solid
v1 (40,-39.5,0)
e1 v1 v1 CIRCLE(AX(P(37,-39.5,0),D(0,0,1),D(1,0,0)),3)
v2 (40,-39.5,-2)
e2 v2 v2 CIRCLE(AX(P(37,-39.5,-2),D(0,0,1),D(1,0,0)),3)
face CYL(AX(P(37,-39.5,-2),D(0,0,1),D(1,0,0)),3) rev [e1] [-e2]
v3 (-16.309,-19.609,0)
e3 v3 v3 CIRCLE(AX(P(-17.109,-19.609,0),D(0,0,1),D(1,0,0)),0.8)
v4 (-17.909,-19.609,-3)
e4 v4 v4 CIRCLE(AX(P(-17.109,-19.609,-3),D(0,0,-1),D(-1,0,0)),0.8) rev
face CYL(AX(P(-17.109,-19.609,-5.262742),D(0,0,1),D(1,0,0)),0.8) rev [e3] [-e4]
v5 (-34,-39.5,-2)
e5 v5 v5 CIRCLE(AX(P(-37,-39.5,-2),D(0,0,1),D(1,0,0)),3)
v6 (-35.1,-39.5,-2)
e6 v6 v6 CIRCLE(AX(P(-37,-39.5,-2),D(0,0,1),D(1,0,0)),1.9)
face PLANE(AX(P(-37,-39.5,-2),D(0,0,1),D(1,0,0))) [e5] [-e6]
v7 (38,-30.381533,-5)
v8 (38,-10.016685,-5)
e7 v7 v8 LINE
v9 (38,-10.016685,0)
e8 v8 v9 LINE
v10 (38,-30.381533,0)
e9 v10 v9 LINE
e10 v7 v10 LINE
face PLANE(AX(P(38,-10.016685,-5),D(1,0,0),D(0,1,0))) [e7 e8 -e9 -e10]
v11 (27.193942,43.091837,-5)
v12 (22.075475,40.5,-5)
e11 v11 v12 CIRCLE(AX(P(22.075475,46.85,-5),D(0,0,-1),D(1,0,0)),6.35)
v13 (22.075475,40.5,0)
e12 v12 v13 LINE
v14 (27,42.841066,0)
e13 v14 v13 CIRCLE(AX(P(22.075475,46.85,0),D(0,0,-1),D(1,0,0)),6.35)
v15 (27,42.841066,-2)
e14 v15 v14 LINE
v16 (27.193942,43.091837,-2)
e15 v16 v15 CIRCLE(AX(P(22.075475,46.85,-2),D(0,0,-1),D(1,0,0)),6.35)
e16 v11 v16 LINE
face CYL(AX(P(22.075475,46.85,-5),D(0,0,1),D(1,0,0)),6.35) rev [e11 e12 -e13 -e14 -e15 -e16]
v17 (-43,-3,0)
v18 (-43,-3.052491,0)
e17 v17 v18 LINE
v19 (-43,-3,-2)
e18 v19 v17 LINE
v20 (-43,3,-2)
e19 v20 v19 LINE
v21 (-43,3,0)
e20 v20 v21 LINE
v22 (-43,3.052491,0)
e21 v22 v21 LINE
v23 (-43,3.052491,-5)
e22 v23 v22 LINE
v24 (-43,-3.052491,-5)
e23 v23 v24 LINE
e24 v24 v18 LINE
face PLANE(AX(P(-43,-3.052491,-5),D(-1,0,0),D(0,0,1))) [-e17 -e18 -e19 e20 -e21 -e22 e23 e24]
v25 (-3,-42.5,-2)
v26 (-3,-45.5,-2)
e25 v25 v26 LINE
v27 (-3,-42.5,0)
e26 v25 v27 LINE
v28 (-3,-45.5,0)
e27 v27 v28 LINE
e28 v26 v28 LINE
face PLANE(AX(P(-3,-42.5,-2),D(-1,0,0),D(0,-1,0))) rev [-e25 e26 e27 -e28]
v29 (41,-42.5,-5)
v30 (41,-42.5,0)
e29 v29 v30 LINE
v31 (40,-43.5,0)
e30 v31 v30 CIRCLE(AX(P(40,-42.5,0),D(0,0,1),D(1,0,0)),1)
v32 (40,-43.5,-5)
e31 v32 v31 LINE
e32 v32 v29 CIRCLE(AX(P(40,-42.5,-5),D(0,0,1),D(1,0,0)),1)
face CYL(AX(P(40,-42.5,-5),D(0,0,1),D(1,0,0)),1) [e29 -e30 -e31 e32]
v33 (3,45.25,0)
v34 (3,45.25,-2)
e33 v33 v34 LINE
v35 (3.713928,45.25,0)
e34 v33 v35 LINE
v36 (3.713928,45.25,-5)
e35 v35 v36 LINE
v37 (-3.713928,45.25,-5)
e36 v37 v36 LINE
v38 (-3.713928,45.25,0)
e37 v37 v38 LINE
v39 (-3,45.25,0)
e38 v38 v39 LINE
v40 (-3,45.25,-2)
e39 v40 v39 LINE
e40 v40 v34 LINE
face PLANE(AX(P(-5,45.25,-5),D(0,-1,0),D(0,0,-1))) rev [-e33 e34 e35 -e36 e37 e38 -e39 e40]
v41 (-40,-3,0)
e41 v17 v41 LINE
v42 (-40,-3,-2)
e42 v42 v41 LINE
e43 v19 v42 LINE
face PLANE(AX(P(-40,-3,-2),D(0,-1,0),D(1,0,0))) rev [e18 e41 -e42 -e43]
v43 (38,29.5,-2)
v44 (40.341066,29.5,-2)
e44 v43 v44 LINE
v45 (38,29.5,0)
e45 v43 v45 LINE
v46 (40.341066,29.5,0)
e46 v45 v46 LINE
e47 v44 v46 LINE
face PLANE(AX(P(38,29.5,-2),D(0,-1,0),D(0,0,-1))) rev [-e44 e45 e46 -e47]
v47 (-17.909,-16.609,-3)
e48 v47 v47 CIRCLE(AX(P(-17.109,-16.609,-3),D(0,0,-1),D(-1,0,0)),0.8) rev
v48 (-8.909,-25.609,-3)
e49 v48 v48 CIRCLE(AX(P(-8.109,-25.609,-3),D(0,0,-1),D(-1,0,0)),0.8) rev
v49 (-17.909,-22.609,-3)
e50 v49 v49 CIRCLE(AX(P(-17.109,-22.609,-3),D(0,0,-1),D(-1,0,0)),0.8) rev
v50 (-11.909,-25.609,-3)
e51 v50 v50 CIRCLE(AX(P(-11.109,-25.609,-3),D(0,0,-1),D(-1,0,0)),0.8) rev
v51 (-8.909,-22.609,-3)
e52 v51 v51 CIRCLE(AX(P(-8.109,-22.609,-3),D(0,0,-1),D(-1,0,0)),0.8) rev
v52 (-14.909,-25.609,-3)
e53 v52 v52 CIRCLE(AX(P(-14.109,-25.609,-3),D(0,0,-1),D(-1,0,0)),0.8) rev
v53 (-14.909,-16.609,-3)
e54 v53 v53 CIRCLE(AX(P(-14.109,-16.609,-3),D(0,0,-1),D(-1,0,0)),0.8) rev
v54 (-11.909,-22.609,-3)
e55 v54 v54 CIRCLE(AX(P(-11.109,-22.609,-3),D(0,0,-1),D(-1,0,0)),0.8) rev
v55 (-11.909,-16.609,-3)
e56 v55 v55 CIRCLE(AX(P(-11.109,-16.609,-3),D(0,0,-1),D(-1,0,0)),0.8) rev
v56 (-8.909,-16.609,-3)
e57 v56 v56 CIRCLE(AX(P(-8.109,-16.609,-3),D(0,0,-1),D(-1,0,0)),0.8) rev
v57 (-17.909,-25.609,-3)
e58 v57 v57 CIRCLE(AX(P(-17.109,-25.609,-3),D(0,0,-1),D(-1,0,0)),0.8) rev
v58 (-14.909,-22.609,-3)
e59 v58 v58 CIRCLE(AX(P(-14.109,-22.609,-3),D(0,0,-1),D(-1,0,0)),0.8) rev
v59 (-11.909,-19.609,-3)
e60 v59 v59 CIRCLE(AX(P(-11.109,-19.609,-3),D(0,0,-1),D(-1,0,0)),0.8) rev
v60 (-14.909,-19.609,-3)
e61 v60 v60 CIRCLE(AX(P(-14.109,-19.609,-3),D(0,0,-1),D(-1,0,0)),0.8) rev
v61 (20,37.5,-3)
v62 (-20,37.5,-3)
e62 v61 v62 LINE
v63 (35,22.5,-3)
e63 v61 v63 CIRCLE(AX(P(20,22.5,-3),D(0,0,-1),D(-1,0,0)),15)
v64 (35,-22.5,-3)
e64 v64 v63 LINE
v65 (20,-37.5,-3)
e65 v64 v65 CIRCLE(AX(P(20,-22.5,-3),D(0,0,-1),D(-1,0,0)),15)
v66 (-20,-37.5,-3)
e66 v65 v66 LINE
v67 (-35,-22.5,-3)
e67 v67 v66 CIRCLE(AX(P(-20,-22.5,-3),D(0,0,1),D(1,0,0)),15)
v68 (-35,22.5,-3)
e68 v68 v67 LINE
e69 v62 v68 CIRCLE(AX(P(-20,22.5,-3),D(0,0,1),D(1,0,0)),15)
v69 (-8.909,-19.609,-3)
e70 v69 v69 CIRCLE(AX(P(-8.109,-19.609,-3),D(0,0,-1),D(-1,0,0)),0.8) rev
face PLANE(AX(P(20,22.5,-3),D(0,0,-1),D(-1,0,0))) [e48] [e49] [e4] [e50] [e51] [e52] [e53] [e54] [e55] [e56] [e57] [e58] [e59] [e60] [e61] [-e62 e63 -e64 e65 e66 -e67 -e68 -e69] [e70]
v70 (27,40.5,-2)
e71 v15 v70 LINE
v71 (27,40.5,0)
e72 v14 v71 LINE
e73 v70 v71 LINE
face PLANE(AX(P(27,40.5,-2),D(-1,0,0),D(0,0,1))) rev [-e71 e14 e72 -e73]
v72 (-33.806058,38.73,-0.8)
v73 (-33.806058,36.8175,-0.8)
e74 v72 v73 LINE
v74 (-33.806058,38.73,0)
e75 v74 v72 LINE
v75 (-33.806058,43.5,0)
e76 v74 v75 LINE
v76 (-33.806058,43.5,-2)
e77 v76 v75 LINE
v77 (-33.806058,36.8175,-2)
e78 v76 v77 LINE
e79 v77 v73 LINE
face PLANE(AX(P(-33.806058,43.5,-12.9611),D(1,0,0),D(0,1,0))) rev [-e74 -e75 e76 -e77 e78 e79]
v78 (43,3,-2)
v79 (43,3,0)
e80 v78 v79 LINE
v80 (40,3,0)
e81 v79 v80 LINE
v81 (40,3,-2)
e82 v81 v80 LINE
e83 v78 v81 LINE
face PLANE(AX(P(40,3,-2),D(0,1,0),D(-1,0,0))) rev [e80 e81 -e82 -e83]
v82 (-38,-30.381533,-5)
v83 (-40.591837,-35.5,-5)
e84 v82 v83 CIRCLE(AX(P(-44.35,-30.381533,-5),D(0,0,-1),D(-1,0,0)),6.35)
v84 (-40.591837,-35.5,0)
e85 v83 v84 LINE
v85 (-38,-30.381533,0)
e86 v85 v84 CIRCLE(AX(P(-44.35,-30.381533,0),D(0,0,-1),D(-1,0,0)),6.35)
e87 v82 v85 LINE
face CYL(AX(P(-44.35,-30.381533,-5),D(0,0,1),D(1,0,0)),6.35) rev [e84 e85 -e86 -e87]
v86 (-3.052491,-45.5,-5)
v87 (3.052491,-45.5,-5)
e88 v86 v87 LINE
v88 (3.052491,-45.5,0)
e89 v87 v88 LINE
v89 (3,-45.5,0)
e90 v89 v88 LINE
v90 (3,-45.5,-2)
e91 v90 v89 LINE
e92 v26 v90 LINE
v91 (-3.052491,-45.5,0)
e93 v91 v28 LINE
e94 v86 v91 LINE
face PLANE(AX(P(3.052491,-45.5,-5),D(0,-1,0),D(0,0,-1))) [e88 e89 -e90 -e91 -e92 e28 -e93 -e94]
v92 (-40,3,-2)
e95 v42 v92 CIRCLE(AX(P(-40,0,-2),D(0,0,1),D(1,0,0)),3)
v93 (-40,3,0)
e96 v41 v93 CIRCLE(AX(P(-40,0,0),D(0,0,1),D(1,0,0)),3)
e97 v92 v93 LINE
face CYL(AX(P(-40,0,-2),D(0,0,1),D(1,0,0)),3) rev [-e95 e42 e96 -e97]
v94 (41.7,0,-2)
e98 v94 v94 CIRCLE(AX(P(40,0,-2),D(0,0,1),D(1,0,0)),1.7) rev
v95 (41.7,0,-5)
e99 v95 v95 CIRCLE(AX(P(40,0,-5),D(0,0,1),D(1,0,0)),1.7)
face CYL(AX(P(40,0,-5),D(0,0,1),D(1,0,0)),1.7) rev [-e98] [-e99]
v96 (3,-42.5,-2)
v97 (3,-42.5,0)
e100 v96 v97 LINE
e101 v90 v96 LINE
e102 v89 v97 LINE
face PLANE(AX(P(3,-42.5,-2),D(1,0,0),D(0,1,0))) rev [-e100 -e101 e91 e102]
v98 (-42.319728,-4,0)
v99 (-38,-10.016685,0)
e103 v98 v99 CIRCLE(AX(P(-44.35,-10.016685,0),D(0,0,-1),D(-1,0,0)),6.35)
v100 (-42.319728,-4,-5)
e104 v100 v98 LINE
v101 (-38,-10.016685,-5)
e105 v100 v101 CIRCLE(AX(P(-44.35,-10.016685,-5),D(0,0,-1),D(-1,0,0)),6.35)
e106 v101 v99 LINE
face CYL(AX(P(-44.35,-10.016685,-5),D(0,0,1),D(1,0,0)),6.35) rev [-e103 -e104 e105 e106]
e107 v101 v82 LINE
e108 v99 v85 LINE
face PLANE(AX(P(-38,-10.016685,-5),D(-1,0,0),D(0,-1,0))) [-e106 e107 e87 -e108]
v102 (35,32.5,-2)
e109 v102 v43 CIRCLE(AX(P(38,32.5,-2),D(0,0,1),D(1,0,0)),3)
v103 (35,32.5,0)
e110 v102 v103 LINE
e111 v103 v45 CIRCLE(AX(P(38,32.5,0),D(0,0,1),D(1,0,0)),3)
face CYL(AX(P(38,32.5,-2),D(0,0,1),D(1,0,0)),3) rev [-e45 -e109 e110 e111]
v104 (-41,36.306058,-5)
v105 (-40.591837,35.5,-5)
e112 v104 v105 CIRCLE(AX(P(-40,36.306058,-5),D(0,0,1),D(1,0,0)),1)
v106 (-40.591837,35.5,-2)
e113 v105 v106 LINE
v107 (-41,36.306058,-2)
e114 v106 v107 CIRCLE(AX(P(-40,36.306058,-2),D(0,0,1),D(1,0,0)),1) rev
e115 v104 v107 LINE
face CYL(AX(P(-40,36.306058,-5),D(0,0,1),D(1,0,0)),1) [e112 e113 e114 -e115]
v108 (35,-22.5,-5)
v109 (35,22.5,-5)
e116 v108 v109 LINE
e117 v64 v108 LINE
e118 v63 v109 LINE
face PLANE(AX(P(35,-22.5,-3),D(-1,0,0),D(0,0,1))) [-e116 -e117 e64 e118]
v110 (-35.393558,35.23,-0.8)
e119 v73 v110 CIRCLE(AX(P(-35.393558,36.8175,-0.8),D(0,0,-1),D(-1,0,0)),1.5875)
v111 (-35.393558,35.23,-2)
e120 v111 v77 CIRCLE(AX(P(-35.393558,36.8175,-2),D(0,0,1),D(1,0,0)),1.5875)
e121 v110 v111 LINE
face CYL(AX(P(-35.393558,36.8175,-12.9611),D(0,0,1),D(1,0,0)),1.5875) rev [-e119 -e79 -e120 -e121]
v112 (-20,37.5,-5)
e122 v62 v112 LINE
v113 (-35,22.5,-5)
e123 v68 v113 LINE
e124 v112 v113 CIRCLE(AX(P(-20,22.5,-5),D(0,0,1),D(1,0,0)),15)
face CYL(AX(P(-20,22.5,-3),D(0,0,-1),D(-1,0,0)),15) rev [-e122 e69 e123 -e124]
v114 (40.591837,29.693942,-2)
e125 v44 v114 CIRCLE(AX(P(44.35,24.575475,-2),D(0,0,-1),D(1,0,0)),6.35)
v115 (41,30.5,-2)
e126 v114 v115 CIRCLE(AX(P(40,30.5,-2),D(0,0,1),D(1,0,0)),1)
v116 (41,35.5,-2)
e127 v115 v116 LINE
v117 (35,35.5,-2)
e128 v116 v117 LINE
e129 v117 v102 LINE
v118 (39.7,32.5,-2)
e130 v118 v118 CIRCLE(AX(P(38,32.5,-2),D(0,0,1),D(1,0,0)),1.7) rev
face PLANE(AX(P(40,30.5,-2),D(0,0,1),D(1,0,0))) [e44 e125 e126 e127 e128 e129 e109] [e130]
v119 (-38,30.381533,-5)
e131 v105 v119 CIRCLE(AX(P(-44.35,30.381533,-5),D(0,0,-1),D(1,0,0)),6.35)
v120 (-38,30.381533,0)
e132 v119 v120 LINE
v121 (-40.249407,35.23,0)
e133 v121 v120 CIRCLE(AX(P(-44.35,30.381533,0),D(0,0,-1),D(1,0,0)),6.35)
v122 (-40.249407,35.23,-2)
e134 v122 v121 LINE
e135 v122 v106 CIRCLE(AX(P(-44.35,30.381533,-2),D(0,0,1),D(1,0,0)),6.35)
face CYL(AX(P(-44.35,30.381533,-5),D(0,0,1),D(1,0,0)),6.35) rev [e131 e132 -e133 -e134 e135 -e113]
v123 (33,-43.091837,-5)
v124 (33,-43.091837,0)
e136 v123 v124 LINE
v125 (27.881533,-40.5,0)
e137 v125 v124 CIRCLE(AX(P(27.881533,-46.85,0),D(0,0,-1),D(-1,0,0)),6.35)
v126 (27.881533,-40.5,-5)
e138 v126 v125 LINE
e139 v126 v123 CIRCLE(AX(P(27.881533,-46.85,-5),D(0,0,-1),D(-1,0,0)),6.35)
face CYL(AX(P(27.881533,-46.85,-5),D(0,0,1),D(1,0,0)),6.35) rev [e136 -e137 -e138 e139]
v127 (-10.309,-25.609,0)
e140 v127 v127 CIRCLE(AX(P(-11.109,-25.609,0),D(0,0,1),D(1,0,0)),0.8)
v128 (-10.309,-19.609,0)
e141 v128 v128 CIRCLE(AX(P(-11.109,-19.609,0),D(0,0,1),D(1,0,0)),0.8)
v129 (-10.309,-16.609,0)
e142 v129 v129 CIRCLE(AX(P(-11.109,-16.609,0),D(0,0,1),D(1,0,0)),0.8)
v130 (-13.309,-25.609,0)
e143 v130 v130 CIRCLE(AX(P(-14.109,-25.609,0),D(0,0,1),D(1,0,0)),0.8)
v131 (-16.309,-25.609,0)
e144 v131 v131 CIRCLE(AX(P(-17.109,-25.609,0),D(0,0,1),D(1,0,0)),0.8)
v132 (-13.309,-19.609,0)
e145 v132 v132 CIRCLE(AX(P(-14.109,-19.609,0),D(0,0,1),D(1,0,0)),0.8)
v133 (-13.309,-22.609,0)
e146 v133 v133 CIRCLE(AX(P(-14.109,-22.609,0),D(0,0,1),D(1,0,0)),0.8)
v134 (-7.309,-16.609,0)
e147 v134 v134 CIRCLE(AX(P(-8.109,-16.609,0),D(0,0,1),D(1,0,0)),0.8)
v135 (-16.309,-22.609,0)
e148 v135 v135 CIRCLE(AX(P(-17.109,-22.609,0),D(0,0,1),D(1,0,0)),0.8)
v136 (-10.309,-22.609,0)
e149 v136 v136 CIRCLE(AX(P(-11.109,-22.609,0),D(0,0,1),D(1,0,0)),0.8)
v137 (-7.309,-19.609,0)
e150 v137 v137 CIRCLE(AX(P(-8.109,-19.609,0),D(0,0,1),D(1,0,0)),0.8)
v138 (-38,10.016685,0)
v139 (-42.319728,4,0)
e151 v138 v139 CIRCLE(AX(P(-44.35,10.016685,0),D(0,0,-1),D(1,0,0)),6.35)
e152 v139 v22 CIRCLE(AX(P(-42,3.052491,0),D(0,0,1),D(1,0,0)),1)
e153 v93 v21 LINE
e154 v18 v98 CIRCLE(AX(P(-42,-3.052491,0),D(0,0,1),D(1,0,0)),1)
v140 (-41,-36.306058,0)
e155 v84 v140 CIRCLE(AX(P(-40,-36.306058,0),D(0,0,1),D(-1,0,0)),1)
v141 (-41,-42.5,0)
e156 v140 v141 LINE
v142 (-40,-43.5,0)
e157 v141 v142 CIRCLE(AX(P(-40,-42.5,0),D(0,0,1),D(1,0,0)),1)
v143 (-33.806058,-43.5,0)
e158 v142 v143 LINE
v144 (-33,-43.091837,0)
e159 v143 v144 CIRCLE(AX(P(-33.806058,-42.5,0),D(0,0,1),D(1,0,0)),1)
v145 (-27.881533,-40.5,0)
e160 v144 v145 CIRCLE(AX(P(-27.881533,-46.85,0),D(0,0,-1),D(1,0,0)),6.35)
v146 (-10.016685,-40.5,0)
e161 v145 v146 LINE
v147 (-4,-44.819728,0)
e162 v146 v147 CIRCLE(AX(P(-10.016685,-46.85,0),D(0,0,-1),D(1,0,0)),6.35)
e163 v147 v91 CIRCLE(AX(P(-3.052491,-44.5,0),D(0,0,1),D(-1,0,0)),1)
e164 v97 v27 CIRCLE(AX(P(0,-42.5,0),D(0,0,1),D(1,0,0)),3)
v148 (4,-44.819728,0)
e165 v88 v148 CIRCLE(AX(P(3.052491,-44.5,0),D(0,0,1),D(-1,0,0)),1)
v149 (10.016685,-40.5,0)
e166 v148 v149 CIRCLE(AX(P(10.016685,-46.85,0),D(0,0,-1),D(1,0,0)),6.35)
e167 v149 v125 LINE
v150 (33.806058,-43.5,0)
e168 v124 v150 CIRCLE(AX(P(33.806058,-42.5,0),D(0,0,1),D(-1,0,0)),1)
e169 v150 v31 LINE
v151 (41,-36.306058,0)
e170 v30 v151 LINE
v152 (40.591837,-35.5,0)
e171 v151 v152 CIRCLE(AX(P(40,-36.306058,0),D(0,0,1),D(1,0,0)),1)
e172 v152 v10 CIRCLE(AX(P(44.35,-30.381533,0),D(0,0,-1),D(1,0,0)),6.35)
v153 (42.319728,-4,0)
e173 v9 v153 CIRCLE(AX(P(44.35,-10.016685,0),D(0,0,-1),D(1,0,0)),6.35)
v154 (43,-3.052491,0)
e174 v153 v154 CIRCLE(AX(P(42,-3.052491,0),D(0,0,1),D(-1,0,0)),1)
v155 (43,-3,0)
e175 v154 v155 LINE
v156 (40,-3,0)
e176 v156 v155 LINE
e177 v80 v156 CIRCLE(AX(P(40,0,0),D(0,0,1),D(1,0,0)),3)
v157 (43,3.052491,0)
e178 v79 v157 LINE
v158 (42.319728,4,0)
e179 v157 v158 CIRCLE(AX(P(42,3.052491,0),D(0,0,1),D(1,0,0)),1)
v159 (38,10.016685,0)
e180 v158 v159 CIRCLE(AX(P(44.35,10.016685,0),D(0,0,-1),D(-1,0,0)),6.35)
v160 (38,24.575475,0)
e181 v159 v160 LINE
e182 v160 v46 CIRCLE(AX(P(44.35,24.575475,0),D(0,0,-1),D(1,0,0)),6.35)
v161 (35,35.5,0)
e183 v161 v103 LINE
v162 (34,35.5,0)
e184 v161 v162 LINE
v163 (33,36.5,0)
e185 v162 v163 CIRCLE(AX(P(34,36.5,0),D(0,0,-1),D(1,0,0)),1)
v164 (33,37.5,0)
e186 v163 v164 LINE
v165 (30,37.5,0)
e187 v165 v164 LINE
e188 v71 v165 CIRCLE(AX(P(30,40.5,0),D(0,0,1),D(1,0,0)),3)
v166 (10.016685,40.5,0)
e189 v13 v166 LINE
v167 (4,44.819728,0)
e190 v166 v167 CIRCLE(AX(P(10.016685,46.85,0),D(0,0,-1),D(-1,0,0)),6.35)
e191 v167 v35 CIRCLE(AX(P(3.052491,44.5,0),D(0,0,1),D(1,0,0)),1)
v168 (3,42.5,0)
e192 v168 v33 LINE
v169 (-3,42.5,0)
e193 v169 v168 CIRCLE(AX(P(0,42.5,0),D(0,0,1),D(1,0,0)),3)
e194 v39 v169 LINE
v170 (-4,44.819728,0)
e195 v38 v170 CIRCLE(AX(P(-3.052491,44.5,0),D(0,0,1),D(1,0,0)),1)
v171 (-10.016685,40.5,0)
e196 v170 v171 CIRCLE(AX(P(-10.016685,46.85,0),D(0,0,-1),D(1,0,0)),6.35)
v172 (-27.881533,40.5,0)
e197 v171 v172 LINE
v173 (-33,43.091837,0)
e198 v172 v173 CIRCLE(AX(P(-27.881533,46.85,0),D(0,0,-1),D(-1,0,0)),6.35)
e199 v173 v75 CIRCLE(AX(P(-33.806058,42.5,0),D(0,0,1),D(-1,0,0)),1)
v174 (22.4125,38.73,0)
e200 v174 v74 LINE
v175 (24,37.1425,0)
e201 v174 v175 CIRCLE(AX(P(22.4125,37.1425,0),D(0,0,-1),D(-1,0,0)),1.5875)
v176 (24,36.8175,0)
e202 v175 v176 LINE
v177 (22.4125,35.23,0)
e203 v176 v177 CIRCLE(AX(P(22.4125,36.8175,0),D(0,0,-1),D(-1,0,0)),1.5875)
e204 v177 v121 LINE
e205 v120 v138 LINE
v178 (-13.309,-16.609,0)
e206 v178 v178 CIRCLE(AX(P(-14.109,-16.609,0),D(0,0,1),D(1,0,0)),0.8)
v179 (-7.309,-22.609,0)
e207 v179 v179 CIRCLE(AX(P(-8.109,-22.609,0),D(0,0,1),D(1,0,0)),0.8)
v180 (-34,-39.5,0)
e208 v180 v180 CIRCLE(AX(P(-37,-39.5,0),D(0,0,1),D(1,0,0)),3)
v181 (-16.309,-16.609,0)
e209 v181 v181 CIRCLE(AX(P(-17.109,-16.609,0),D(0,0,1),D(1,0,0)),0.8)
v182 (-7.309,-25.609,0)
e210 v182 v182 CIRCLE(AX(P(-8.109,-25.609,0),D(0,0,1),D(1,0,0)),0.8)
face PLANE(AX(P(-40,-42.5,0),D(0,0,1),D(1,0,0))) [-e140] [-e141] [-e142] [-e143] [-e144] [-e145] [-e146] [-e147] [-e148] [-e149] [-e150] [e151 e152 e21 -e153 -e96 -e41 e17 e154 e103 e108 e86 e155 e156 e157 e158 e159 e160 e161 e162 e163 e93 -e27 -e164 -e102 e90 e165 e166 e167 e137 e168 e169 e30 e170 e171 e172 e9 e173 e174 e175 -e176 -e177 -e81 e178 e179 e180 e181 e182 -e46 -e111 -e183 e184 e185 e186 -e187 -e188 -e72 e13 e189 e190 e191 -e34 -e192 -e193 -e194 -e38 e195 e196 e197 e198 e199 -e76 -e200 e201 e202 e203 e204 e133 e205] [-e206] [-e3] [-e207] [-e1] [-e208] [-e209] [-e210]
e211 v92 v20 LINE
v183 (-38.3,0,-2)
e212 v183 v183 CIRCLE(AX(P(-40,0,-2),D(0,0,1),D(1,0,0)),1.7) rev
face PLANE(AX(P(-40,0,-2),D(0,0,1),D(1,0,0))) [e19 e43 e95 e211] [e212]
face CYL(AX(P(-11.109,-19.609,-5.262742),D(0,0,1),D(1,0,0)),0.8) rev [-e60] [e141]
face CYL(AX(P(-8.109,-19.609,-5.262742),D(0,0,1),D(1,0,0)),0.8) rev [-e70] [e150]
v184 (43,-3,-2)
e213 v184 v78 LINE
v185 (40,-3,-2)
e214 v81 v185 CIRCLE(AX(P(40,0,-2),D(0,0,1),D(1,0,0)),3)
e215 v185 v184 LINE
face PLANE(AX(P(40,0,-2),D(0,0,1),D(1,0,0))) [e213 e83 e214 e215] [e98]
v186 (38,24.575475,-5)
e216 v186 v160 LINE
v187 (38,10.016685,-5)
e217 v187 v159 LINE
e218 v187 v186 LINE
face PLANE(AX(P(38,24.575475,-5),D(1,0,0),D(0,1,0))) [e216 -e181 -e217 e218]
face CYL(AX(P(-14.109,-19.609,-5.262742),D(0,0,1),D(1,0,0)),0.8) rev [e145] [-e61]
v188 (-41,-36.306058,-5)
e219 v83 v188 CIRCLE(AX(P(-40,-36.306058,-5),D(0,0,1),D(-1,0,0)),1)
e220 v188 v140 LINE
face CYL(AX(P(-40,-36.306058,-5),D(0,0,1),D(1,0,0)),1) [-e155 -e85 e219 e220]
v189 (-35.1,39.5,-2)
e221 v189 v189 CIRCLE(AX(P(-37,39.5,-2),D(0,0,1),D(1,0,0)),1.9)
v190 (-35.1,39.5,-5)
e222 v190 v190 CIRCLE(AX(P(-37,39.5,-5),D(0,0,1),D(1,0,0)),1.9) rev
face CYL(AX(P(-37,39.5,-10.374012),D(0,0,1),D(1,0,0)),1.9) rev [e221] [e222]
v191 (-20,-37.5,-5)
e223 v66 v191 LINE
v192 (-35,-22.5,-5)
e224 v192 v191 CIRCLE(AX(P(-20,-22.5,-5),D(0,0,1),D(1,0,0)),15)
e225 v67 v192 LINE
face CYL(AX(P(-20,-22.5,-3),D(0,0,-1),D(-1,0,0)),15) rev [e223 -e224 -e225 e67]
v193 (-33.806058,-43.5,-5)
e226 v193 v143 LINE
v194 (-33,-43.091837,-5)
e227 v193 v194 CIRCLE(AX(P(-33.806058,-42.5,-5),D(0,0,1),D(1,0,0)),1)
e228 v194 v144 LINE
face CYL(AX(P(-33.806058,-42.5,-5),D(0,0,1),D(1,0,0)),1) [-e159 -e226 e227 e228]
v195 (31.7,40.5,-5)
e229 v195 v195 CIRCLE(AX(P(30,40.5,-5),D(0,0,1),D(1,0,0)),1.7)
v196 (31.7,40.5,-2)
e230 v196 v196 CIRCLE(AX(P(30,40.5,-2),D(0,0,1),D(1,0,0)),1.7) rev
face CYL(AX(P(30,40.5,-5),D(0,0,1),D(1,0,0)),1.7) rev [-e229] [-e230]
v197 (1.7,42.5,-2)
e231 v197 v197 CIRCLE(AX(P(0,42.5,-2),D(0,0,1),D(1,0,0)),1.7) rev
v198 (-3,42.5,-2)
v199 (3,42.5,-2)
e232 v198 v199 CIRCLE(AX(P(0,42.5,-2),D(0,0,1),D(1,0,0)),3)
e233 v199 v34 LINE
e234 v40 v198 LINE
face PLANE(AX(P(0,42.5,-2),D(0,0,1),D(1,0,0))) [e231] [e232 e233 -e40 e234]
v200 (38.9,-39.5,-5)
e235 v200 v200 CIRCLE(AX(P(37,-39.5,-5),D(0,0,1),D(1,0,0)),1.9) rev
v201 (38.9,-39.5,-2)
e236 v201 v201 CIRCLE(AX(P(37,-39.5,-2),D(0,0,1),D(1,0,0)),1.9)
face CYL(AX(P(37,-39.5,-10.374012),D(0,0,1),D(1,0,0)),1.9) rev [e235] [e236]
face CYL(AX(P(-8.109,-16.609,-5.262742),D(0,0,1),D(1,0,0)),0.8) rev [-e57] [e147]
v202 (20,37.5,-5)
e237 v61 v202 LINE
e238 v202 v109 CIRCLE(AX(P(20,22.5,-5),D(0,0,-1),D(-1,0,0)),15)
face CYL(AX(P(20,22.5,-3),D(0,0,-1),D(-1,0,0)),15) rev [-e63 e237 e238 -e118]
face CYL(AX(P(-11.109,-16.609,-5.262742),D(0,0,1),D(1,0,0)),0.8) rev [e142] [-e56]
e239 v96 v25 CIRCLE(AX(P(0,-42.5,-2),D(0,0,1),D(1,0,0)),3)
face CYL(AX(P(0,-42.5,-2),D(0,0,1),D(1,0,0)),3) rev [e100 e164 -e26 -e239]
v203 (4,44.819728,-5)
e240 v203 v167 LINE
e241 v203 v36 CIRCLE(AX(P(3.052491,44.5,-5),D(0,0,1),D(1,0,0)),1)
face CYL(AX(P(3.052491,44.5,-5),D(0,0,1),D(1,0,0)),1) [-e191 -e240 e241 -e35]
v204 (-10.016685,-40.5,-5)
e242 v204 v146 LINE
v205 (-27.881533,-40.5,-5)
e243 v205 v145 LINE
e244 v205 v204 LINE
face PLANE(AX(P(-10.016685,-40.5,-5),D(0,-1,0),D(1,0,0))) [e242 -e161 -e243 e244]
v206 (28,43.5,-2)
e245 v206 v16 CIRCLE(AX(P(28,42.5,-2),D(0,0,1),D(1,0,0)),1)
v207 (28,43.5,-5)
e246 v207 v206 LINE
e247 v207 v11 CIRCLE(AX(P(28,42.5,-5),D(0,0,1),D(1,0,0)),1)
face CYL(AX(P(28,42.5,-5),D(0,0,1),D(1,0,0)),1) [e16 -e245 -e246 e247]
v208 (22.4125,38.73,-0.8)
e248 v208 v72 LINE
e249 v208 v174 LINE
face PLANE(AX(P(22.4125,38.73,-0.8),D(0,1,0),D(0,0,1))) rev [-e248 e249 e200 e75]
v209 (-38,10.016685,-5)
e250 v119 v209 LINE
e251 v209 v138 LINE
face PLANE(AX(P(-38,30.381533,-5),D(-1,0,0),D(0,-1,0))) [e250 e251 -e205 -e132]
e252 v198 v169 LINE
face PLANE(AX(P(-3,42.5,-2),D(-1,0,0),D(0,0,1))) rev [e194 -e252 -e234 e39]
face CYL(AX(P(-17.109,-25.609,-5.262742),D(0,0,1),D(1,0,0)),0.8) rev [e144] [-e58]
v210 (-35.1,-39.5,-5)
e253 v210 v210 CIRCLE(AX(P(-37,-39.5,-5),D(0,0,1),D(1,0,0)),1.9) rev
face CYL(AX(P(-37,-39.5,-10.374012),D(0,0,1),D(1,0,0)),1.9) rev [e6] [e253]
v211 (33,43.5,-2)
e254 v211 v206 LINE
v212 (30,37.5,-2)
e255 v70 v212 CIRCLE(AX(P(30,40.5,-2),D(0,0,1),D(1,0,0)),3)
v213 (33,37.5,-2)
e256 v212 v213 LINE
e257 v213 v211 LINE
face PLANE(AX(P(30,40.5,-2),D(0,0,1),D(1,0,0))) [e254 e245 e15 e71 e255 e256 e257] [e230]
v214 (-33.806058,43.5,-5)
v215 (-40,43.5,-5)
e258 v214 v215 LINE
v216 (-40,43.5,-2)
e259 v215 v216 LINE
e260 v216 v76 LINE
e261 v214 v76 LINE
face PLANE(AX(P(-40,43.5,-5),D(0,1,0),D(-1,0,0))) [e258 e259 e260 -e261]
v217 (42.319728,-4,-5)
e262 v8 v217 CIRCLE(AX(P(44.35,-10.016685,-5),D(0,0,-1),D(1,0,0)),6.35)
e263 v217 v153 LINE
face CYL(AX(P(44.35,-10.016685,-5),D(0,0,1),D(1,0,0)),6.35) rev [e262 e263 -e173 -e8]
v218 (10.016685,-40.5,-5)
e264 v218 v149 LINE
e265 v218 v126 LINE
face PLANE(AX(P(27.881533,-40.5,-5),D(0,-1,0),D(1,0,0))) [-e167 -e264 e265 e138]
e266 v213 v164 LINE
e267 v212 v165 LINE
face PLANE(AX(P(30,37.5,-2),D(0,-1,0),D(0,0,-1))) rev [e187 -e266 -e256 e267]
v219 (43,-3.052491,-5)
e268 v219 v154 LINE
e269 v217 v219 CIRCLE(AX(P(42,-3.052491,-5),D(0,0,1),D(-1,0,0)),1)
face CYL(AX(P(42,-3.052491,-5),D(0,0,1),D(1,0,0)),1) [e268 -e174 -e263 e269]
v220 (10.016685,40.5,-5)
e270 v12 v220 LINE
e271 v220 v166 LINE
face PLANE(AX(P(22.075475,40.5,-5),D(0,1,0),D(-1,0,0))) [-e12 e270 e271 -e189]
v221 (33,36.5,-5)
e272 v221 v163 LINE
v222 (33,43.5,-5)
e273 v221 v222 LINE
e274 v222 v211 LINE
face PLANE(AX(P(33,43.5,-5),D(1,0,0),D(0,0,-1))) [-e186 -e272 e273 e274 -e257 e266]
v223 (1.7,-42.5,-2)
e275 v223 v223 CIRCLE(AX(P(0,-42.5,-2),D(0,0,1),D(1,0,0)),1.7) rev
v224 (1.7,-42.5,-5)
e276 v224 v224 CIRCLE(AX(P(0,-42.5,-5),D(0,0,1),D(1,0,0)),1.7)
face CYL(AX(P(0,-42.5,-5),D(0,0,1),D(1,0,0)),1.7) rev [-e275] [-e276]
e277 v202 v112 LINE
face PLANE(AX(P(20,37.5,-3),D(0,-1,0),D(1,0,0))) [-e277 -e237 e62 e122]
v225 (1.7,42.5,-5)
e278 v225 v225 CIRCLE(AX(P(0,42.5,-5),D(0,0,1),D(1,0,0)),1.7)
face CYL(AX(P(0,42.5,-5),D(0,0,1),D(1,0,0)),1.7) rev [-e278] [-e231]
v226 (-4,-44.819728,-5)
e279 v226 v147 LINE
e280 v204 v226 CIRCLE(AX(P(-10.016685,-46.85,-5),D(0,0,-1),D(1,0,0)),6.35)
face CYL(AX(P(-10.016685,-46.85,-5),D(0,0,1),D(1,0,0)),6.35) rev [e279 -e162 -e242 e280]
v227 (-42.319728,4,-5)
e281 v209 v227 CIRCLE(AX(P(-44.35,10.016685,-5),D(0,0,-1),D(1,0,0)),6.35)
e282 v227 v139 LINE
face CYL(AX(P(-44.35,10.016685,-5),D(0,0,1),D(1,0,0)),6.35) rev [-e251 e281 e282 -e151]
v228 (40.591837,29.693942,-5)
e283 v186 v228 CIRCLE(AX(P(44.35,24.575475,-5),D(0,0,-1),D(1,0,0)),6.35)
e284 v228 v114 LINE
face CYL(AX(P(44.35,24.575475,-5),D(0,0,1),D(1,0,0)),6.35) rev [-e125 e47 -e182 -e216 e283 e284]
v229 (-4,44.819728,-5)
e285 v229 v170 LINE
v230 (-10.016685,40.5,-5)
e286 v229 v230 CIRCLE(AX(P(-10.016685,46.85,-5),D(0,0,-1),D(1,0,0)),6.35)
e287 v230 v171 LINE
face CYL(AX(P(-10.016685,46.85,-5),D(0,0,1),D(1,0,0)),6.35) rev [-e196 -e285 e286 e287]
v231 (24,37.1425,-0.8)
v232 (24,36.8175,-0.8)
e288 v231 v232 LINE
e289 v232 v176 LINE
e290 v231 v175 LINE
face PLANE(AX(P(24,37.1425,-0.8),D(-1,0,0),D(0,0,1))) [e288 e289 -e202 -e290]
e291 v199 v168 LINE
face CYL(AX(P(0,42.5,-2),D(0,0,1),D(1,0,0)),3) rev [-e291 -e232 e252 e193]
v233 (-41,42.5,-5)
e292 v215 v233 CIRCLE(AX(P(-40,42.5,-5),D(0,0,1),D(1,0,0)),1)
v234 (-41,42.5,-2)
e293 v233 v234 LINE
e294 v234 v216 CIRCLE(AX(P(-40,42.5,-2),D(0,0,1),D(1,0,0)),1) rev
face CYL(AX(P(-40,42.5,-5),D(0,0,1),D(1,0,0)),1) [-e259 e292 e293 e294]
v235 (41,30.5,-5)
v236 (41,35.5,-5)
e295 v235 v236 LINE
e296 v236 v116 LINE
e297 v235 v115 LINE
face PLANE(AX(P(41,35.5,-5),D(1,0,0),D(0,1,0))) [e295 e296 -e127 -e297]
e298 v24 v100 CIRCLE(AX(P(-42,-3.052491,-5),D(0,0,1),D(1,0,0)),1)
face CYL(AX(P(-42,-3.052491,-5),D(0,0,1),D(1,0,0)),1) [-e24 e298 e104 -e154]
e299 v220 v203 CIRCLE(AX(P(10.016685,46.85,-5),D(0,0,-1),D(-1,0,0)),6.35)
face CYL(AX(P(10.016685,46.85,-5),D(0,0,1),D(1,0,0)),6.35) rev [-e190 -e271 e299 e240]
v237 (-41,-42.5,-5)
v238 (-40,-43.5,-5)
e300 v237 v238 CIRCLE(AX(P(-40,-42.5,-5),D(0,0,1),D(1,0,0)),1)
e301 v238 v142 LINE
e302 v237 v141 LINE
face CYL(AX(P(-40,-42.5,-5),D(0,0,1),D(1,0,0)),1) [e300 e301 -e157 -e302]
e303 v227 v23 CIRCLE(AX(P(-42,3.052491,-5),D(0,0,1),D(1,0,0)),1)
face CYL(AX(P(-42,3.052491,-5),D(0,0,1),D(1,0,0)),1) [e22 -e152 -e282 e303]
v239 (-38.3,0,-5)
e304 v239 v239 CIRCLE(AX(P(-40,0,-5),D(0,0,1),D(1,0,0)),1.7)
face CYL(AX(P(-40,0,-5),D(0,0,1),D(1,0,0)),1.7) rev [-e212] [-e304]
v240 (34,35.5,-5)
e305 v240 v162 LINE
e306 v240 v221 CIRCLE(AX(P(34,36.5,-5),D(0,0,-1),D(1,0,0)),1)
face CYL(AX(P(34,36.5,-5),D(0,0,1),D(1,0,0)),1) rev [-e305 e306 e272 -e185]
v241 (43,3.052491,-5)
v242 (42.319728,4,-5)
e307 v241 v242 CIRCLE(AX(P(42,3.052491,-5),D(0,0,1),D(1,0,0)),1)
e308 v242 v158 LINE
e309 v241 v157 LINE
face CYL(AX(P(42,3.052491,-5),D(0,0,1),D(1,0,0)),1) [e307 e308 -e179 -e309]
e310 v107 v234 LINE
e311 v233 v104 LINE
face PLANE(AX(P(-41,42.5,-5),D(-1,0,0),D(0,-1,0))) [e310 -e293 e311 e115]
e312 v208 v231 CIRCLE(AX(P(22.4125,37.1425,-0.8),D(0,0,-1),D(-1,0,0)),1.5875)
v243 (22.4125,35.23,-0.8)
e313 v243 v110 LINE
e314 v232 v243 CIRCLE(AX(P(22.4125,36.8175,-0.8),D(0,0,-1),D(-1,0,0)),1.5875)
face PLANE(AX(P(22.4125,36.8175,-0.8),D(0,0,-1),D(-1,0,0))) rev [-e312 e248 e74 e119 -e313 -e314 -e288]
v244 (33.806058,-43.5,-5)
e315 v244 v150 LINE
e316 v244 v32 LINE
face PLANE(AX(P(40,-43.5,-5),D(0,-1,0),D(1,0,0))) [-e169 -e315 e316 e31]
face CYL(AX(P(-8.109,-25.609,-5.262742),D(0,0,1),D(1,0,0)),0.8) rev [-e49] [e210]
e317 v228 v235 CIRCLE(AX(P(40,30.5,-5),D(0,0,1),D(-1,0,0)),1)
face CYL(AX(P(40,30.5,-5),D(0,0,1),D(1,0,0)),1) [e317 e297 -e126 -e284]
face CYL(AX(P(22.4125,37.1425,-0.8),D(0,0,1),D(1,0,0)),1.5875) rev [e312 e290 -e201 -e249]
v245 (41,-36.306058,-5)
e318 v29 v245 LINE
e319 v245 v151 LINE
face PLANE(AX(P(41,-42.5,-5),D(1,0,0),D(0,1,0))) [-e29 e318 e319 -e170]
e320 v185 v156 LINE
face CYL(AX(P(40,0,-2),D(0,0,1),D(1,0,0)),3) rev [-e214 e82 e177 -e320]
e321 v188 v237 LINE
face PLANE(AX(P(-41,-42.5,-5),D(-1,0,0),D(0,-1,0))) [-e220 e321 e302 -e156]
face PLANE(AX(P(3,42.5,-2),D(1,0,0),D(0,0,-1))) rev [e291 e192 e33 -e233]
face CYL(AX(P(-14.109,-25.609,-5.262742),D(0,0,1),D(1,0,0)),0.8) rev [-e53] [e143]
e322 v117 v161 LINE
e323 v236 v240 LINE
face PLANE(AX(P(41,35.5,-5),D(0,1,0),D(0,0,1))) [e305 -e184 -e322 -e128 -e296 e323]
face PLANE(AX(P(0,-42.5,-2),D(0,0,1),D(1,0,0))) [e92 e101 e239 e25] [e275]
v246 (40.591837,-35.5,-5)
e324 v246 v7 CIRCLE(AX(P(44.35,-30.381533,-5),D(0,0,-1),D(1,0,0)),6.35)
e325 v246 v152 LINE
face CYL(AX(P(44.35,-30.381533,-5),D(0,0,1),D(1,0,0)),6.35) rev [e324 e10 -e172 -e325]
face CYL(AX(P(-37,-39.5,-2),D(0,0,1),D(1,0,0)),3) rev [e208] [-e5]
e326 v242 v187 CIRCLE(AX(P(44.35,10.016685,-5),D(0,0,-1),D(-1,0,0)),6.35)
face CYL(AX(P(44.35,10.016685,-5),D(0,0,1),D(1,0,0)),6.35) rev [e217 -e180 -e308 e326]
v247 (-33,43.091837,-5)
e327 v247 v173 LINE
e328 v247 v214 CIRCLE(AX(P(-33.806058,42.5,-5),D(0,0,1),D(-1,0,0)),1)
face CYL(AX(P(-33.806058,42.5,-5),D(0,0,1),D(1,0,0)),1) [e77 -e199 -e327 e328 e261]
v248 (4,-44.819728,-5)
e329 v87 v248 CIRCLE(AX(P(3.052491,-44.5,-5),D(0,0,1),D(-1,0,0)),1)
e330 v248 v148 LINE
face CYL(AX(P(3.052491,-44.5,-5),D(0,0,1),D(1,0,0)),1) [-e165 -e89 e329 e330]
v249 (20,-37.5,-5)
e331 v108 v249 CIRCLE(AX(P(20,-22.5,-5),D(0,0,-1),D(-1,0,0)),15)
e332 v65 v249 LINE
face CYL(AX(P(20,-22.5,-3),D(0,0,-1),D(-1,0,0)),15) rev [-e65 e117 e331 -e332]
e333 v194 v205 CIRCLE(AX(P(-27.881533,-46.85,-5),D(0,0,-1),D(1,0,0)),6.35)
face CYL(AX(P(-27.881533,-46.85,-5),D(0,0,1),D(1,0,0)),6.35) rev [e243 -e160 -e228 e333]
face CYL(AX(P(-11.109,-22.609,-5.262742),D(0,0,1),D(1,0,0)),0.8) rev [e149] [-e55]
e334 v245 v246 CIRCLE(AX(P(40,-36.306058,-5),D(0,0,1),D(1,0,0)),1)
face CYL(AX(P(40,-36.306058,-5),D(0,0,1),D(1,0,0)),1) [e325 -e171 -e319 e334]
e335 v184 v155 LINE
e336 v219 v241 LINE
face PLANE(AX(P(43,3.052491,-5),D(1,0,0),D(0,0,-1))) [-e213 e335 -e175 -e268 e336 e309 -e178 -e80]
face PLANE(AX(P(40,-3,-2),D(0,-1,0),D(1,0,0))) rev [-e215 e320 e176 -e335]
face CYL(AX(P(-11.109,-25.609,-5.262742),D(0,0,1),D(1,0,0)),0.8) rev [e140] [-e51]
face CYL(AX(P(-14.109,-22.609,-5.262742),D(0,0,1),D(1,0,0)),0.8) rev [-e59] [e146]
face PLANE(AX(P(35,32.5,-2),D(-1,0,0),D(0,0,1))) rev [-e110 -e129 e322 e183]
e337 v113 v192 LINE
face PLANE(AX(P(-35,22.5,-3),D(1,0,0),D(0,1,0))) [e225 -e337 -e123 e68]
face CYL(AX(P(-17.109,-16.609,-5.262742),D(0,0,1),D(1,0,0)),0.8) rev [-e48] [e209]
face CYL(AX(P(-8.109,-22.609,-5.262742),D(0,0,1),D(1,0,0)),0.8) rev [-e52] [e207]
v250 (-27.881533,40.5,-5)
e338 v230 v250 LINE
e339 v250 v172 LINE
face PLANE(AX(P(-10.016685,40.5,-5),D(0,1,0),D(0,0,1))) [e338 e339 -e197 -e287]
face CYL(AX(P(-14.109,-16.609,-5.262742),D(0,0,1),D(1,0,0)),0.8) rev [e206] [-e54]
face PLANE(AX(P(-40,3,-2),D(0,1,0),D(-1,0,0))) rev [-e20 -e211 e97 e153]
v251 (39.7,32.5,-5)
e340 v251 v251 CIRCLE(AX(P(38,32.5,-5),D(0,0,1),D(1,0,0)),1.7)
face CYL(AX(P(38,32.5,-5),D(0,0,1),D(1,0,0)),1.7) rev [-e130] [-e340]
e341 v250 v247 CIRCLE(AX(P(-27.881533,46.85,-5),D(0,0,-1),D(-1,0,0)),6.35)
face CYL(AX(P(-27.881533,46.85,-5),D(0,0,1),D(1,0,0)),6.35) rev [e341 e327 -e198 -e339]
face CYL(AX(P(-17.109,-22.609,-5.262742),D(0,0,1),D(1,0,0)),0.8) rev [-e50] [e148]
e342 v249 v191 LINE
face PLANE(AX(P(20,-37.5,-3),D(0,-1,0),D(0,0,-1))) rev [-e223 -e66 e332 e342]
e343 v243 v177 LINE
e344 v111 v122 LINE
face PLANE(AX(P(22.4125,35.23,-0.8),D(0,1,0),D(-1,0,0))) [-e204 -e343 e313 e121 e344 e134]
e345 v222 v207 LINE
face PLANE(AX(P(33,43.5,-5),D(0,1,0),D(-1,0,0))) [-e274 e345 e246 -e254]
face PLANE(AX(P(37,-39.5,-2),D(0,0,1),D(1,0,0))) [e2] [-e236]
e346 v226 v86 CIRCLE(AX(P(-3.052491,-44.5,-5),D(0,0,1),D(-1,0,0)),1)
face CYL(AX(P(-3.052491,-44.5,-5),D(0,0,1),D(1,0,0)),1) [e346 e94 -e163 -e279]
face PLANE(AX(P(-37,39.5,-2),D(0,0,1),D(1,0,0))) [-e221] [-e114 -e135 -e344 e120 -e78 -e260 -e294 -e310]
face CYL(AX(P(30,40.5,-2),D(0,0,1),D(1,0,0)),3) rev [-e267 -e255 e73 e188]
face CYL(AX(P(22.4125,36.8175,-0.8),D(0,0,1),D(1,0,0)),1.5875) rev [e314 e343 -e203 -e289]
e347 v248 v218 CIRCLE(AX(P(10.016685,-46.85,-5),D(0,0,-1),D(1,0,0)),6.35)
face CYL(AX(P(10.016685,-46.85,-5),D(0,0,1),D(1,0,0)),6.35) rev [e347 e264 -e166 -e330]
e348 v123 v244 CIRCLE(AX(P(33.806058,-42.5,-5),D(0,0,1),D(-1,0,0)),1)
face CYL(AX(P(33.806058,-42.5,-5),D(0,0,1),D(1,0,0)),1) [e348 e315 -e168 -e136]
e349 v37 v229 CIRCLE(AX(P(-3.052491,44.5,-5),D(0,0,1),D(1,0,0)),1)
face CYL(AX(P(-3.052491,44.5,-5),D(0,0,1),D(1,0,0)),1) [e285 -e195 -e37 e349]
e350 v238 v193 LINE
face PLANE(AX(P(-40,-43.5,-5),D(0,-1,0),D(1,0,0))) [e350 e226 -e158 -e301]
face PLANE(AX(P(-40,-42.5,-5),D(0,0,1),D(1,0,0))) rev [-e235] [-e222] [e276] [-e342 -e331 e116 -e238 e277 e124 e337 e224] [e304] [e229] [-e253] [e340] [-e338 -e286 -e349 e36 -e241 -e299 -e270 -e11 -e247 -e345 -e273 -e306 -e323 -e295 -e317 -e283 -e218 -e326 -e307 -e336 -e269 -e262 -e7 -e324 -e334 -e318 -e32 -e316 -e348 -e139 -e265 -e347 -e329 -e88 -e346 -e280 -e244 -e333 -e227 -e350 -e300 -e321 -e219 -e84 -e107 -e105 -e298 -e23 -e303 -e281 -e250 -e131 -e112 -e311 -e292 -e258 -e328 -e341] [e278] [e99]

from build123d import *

# Parameters (mm, degrees)
SKETCH1_R           = 1.7
BOSS_EXTRUDE1_DEPTH = 5
CUT_EXTRUDE1_DEPTH  = 2
SKETCH3_R           = 3
CUT_EXTRUDE2_DEPTH  = 2
SKETCH4_R           = 1.9
CUT_EXTRUDE3_DEPTH  = 3
SKETCH5_R           = 0.8
CUT_EXTRUDE4_DEPTH  = 3
CUT_EXTRUDE8_DEPTH  = 0.8
FILLET1_R           = 1.5875
CUT_EXTRUDE9_REACH  = 64.803
SKETCH8_W           = 7.193942136
SKETCH8_H           = 8.27
FILLET2_R           = 1.5875
SKETCH9_W           = 5
SKETCH9_H           = 0.25
CUT_EXTRUDE11_DEPTH = 5


with BuildPart() as part:
    # Sketch1 → Boss-Extrude1 (new body)
    with BuildSketch(Plane.XY):
        with BuildLine():
            Line((43, -3.052490593), (43, 3.052490593))
            ThreePointArc((43, 3.052490593), (42.8123201, 3.635702437), (42.319727891, 4))
            ThreePointArc((42.319727891, 4), (39.191767362, 6.313289526), (38, 10.016684732))
            Line((38, 10.016684732), (38, 24.575474703))
            ThreePointArc((38, 24.575474703), (38.684894673, 27.444112294), (40.591836735, 29.693942136))
            ThreePointArc((40.591836735, 29.693942136), (40.892142571, 30.048246049), (41, 30.5))
            Line((41, 30.5), (41, 35.5))
            Line((41, 35.5), (34, 35.5))
            ThreePointArc((34, 35.5), (33.292893219, 35.792893219), (33, 36.5))
            Line((33, 36.5), (33, 43.5))
            Line((33, 43.5), (28, 43.5))
            ThreePointArc((28, 43.5), (27.548246049, 43.392142571), (27.193942136, 43.091836735))
            ThreePointArc((27.193942136, 43.091836735), (24.944112294, 41.184894673), (22.075474703, 40.5))
            Line((22.075474703, 40.5), (10.016684732, 40.5))
            ThreePointArc((10.016684732, 40.5), (6.313289526, 41.691767362), (4, 44.819727891))
            ThreePointArc((4, 44.819727891), (3.635702437, 45.3123201), (3.052490593, 45.5))
            Line((3.052490593, 45.5), (-3.052490593, 45.5))
            ThreePointArc((-3.052490593, 45.5), (-3.635702437, 45.3123201), (-4, 44.819727891))
            ThreePointArc((-4, 44.819727891), (-6.313289526, 41.691767362), (-10.016684732, 40.5))
            Line((-10.016684732, 40.5), (-27.881532566, 40.5))
            ThreePointArc((-27.881532566, 40.5), (-30.750170158, 41.184894673), (-33, 43.091836735))
            ThreePointArc((-33, 43.091836735), (-33.354303912, 43.392142571), (-33.806057864, 43.5))
            Line((-33.806057864, 43.5), (-40, 43.5))
            ThreePointArc((-40, 43.5), (-40.707106781, 43.207106781), (-41, 42.5))
            Line((-41, 42.5), (-41, 36.306057864))
            ThreePointArc((-41, 36.306057864), (-40.892142571, 35.854303912), (-40.591836735, 35.5))
            ThreePointArc((-40.591836735, 35.5), (-38.684894673, 33.250170158), (-38, 30.381532566))
            Line((-38, 30.381532566), (-38, 10.016684732))
            ThreePointArc((-38, 10.016684732), (-39.191767362, 6.313289526), (-42.319727891, 4))
            ThreePointArc((-42.319727891, 4), (-42.8123201, 3.635702437), (-43, 3.052490593))
            Line((-43, 3.052490593), (-43, -3.052490593))
            ThreePointArc((-43, -3.052490593), (-42.8123201, -3.635702437), (-42.319727891, -4))
            ThreePointArc((-42.319727891, -4), (-39.191767362, -6.313289526), (-38, -10.016684732))
            Line((-38, -10.016684732), (-38, -30.381532566))
            ThreePointArc((-38, -30.381532566), (-38.684894673, -33.250170158), (-40.591836735, -35.5))
            ThreePointArc((-40.591836735, -35.5), (-40.892142571, -35.854303912), (-41, -36.306057864))
            Line((-41, -36.306057864), (-41, -42.5))
            ThreePointArc((-41, -42.5), (-40.707106781, -43.207106781), (-40, -43.5))
            Line((-40, -43.5), (-33.806057864, -43.5))
            ThreePointArc((-33.806057864, -43.5), (-33.354303912, -43.392142571), (-33, -43.091836735))
            ThreePointArc((-33, -43.091836735), (-30.750170158, -41.184894673), (-27.881532566, -40.5))
            Line((-27.881532566, -40.5), (-10.016684732, -40.5))
            ThreePointArc((-10.016684732, -40.5), (-6.313289526, -41.691767362), (-4, -44.819727891))
            ThreePointArc((-4, -44.819727891), (-3.635702437, -45.3123201), (-3.052490593, -45.5))
            Line((-3.052490593, -45.5), (3.052490593, -45.5))
            ThreePointArc((3.052490593, -45.5), (3.635702437, -45.3123201), (4, -44.819727891))
            ThreePointArc((4, -44.819727891), (6.313289526, -41.691767362), (10.016684732, -40.5))
            Line((10.016684732, -40.5), (27.881532566, -40.5))
            ThreePointArc((27.881532566, -40.5), (30.750170158, -41.184894673), (33, -43.091836735))
            ThreePointArc((33, -43.091836735), (33.354303912, -43.392142571), (33.806057864, -43.5))
            Line((33.806057864, -43.5), (40, -43.5))
            ThreePointArc((40, -43.5), (40.707106781, -43.207106781), (41, -42.5))
            Line((41, -42.5), (41, -36.306057864))
            ThreePointArc((41, -36.306057864), (40.892142571, -35.854303912), (40.591836735, -35.5))
            ThreePointArc((40.591836735, -35.5), (38.684894673, -33.250170158), (38, -30.381532566))
            Line((38, -30.381532566), (38, -10.016684732))
            ThreePointArc((38, -10.016684732), (39.191767362, -6.313289526), (42.319727891, -4))
            ThreePointArc((42.319727891, -4), (42.8123201, -3.635702437), (43, -3.052490593))
        make_face()
        with Locations((0, -42.5)):
            Circle(SKETCH1_R, mode=Mode.SUBTRACT)
        with Locations((-40, 0)):
            Circle(SKETCH1_R, mode=Mode.SUBTRACT)
        with Locations((40, 0)):
            Circle(SKETCH1_R, mode=Mode.SUBTRACT)
        with Locations((0, 42.5)):
            Circle(SKETCH1_R, mode=Mode.SUBTRACT)
        with Locations((38, 32.5)):
            Circle(SKETCH1_R, mode=Mode.SUBTRACT)
        with Locations((30, 40.5)):
            Circle(SKETCH1_R, mode=Mode.SUBTRACT)
    extrude(amount=-BOSS_EXTRUDE1_DEPTH)

    # Sketch2 → Cut-Extrude1 (cut)
    with BuildSketch(Plane(origin=(0, 0, -5), x_dir=(-1, 0, 0), z_dir=(0, 0, -1))):
        with BuildLine():
            Line((-20, 37.5), (20, 37.5))
            ThreePointArc((20, 37.5), (30.606601718, 33.106601718), (35, 22.5))
            Line((35, 22.5), (35, -22.5))
            ThreePointArc((35, -22.5), (30.606601718, -33.106601718), (20, -37.5))
            Line((20, -37.5), (-20, -37.5))
            ThreePointArc((-20, -37.5), (-30.606601718, -33.106601718), (-35, -22.5))
            Line((-35, -22.5), (-35, 22.5))
            ThreePointArc((-35, 22.5), (-30.606601718, 33.106601718), (-20, 37.5))
        make_face()
    extrude(amount=-CUT_EXTRUDE1_DEPTH, mode=Mode.SUBTRACT)

    # Sketch3 → Cut-Extrude2 (cut)
    with BuildSketch(Plane.XY):
        with Locations((-37, 39.5)):
            Circle(SKETCH3_R)
        with Locations((-37, -39.5)):
            Circle(SKETCH3_R)
        with Locations((37, -39.5)):
            Circle(SKETCH3_R)
        with BuildLine():
            Line((40, 3), (43, 3))
            Line((43, 3), (43, -3))
            Line((43, -3), (40, -3))
            ThreePointArc((40, -3), (37, 0), (40, 3))
        make_face()
        with BuildLine():
            Line((-40, 3), (-43, 3))
            Line((-43, 3), (-43, -3))
            Line((-43, -3), (-40, -3))
            ThreePointArc((-40, -3), (-37, 0), (-40, 3))
        make_face()
        with BuildLine():
            Line((-3, 42.5), (-3, 45.5))
            Line((-3, 45.5), (3, 45.5))
            Line((3, 45.5), (3, 42.5))
            ThreePointArc((3, 42.5), (0, 39.5), (-3, 42.5))
        make_face()
        with BuildLine():
            Line((-3, -42.5), (-3, -45.5))
            Line((-3, -45.5), (3, -45.5))
            Line((3, -45.5), (3, -42.5))
            ThreePointArc((3, -42.5), (0, -39.5), (-3, -42.5))
        make_face()
        with BuildLine():
            Line((38, 29.5), (40.341066152, 29.5))
            ThreePointArc((40.341066152, 29.5), (40.465240963, 29.598536241), (40.591836735, 29.693942136))
            ThreePointArc((40.591836735, 29.693942136), (40.892142571, 30.048246049), (41, 30.5))
            Line((41, 30.5), (41, 35.5))
            Line((41, 35.5), (35, 35.5))
            Line((35, 35.5), (35, 32.5))
            ThreePointArc((35, 32.5), (35.878679656, 30.378679656), (38, 29.5))
        make_face()
        with BuildLine():
            Line((30, 37.5), (33, 37.5))
            Line((33, 37.5), (33, 43.5))
            Line((33, 43.5), (28, 43.5))
            ThreePointArc((28, 43.5), (27.548246049, 43.392142571), (27.193942136, 43.091836735))
            ThreePointArc((27.193942136, 43.091836735), (27.098536241, 42.965240963), (27, 42.841066152))
            Line((27, 42.841066152), (27, 40.5))
            ThreePointArc((27, 40.5), (27.878679656, 38.378679656), (30, 37.5))
        make_face()
    extrude(amount=-CUT_EXTRUDE2_DEPTH, mode=Mode.SUBTRACT)

    # Sketch4 → Cut-Extrude3 (cut)
    with BuildSketch(Plane.XY.offset(-2)):
        with Locations((-37, 39.5)):
            Circle(SKETCH4_R)
        with Locations((37, -39.5)):
            Circle(SKETCH4_R)
        with Locations((-37, -39.5)):
            Circle(SKETCH4_R)
    extrude(amount=-CUT_EXTRUDE3_DEPTH, mode=Mode.SUBTRACT)

    # Sketch5 → Cut-Extrude4 (cut)
    with BuildSketch(Plane.XY):
        with Locations((-17.109, -19.609)):
            Circle(SKETCH5_R)
        with Locations((-14.109, -19.609)):
            Circle(SKETCH5_R)
        with Locations((-11.109, -19.609)):
            Circle(SKETCH5_R)
        with Locations((-8.109, -19.609)):
            Circle(SKETCH5_R)
        with Locations((-17.109, -22.609)):
            Circle(SKETCH5_R)
        with Locations((-14.109, -22.609)):
            Circle(SKETCH5_R)
        with Locations((-11.109, -22.609)):
            Circle(SKETCH5_R)
        with Locations((-8.109, -22.609)):
            Circle(SKETCH5_R)
        with Locations((-17.109, -25.609)):
            Circle(SKETCH5_R)
        with Locations((-14.109, -25.609)):
            Circle(SKETCH5_R)
        with Locations((-11.109, -25.609)):
            Circle(SKETCH5_R)
        with Locations((-8.109, -25.609)):
            Circle(SKETCH5_R)
        with Locations((-17.109, -16.609)):
            Circle(SKETCH5_R)
        with Locations((-14.109, -16.609)):
            Circle(SKETCH5_R)
        with Locations((-11.109, -16.609)):
            Circle(SKETCH5_R)
        with Locations((-8.109, -16.609)):
            Circle(SKETCH5_R)
    extrude(amount=-CUT_EXTRUDE4_DEPTH, mode=Mode.SUBTRACT)

    # Sketch7 → Cut-Extrude8 (cut)
    with BuildSketch(Plane.XY):
        with BuildLine():
            Line((22.4125, 38.73), (-34.100500043, 38.73))
            ThreePointArc((-34.100500043, 38.73), (-35.171065884, 37.12197561), (-37, 36.5))
            Line((-37, 36.5), (-37, 35.23))
            Line((-37, 35.23), (22.4125, 35.23))
            ThreePointArc((22.4125, 35.23), (23.535032015, 35.694967985), (24, 36.8175))
            Line((24, 36.8175), (24, 37.1425))
            ThreePointArc((24, 37.1425), (23.535032015, 38.265032015), (22.4125, 38.73))
        make_face()
    extrude(amount=-CUT_EXTRUDE8_DEPTH, mode=Mode.SUBTRACT)

    # Fillet1
    # the kernel refuses this fillet: 1.5875 mm, written as the material it adds along each edge
    with BuildSketch(Plane(origin=(-37, 35.23, 0), x_dir=(1.4714388937389554e-12, 1.0, 0), z_dir=(0, 0, -1))) as fillet1_piece_1:
        with BuildLine():
            CenterArc((1.5875, 1.555425987), FILLET1_R, 180, 78.463040967)
            Line((0, 1.555425987), (-0.03175, 1.555425987))
            Line((-0.03175, 1.555425987), (-0.03175, 0))
            Line((-0.03175, 0), (0, -0.03175))
            ThreePointArc((0, -0.03175), (0.635, -0.03175), (1.26365, -0.03110852))
            Line((1.26365, -0.03110852), (1.27, 0))
        make_face()
    extrude(amount=4.688564967)

    # Cut-Extrude9: up to this face of the body (flat: up to its plane)
    cut_extrude9_end = Plane(part.part.faces().sort_by_distance((-39.915147186, 39.5, -2))[0])
    # Sketch8 → Cut-Extrude9 (cut, up to the picked face)
    with BuildSketch(Plane.XY, mode=Mode.PRIVATE) as cut_extrude9_sk1:
        with Locations((-37.403028932, 39.365)):
            Rectangle(SKETCH8_W, SKETCH8_H)
    cut_extrude9_tool1 = split(extrude(cut_extrude9_sk1.sketch, amount=-CUT_EXTRUDE9_REACH, mode=Mode.PRIVATE), bisect_by=cut_extrude9_end, keep=Keep.BOTH, mode=Mode.PRIVATE)
    add(cut_extrude9_tool1.solids().sort_by(Axis((-37.403029, 39.365, 0), (0, 0, -1)))[0], mode=Mode.SUBTRACT)

    # Fillet2
    fillet2_edges = [part.edges().sort_by_distance(p)[0] for p in [
        (-33.806057864, 35.23, -1.4),
    ]]
    fillet(fillet2_edges, radius=FILLET2_R)

    # Sketch9 → Cut-Extrude11 (cut, symmetric)
    with BuildSketch(Plane(origin=(0, 0, 0), x_dir=(0, 0, -1), z_dir=(1, 0, 0))):
        with Locations((2.5, 45.375)):
            Rectangle(SKETCH9_W, SKETCH9_H)
    extrude(amount=CUT_EXTRUDE11_DEPTH, both=True, mode=Mode.SUBTRACT)


solid = part.part
